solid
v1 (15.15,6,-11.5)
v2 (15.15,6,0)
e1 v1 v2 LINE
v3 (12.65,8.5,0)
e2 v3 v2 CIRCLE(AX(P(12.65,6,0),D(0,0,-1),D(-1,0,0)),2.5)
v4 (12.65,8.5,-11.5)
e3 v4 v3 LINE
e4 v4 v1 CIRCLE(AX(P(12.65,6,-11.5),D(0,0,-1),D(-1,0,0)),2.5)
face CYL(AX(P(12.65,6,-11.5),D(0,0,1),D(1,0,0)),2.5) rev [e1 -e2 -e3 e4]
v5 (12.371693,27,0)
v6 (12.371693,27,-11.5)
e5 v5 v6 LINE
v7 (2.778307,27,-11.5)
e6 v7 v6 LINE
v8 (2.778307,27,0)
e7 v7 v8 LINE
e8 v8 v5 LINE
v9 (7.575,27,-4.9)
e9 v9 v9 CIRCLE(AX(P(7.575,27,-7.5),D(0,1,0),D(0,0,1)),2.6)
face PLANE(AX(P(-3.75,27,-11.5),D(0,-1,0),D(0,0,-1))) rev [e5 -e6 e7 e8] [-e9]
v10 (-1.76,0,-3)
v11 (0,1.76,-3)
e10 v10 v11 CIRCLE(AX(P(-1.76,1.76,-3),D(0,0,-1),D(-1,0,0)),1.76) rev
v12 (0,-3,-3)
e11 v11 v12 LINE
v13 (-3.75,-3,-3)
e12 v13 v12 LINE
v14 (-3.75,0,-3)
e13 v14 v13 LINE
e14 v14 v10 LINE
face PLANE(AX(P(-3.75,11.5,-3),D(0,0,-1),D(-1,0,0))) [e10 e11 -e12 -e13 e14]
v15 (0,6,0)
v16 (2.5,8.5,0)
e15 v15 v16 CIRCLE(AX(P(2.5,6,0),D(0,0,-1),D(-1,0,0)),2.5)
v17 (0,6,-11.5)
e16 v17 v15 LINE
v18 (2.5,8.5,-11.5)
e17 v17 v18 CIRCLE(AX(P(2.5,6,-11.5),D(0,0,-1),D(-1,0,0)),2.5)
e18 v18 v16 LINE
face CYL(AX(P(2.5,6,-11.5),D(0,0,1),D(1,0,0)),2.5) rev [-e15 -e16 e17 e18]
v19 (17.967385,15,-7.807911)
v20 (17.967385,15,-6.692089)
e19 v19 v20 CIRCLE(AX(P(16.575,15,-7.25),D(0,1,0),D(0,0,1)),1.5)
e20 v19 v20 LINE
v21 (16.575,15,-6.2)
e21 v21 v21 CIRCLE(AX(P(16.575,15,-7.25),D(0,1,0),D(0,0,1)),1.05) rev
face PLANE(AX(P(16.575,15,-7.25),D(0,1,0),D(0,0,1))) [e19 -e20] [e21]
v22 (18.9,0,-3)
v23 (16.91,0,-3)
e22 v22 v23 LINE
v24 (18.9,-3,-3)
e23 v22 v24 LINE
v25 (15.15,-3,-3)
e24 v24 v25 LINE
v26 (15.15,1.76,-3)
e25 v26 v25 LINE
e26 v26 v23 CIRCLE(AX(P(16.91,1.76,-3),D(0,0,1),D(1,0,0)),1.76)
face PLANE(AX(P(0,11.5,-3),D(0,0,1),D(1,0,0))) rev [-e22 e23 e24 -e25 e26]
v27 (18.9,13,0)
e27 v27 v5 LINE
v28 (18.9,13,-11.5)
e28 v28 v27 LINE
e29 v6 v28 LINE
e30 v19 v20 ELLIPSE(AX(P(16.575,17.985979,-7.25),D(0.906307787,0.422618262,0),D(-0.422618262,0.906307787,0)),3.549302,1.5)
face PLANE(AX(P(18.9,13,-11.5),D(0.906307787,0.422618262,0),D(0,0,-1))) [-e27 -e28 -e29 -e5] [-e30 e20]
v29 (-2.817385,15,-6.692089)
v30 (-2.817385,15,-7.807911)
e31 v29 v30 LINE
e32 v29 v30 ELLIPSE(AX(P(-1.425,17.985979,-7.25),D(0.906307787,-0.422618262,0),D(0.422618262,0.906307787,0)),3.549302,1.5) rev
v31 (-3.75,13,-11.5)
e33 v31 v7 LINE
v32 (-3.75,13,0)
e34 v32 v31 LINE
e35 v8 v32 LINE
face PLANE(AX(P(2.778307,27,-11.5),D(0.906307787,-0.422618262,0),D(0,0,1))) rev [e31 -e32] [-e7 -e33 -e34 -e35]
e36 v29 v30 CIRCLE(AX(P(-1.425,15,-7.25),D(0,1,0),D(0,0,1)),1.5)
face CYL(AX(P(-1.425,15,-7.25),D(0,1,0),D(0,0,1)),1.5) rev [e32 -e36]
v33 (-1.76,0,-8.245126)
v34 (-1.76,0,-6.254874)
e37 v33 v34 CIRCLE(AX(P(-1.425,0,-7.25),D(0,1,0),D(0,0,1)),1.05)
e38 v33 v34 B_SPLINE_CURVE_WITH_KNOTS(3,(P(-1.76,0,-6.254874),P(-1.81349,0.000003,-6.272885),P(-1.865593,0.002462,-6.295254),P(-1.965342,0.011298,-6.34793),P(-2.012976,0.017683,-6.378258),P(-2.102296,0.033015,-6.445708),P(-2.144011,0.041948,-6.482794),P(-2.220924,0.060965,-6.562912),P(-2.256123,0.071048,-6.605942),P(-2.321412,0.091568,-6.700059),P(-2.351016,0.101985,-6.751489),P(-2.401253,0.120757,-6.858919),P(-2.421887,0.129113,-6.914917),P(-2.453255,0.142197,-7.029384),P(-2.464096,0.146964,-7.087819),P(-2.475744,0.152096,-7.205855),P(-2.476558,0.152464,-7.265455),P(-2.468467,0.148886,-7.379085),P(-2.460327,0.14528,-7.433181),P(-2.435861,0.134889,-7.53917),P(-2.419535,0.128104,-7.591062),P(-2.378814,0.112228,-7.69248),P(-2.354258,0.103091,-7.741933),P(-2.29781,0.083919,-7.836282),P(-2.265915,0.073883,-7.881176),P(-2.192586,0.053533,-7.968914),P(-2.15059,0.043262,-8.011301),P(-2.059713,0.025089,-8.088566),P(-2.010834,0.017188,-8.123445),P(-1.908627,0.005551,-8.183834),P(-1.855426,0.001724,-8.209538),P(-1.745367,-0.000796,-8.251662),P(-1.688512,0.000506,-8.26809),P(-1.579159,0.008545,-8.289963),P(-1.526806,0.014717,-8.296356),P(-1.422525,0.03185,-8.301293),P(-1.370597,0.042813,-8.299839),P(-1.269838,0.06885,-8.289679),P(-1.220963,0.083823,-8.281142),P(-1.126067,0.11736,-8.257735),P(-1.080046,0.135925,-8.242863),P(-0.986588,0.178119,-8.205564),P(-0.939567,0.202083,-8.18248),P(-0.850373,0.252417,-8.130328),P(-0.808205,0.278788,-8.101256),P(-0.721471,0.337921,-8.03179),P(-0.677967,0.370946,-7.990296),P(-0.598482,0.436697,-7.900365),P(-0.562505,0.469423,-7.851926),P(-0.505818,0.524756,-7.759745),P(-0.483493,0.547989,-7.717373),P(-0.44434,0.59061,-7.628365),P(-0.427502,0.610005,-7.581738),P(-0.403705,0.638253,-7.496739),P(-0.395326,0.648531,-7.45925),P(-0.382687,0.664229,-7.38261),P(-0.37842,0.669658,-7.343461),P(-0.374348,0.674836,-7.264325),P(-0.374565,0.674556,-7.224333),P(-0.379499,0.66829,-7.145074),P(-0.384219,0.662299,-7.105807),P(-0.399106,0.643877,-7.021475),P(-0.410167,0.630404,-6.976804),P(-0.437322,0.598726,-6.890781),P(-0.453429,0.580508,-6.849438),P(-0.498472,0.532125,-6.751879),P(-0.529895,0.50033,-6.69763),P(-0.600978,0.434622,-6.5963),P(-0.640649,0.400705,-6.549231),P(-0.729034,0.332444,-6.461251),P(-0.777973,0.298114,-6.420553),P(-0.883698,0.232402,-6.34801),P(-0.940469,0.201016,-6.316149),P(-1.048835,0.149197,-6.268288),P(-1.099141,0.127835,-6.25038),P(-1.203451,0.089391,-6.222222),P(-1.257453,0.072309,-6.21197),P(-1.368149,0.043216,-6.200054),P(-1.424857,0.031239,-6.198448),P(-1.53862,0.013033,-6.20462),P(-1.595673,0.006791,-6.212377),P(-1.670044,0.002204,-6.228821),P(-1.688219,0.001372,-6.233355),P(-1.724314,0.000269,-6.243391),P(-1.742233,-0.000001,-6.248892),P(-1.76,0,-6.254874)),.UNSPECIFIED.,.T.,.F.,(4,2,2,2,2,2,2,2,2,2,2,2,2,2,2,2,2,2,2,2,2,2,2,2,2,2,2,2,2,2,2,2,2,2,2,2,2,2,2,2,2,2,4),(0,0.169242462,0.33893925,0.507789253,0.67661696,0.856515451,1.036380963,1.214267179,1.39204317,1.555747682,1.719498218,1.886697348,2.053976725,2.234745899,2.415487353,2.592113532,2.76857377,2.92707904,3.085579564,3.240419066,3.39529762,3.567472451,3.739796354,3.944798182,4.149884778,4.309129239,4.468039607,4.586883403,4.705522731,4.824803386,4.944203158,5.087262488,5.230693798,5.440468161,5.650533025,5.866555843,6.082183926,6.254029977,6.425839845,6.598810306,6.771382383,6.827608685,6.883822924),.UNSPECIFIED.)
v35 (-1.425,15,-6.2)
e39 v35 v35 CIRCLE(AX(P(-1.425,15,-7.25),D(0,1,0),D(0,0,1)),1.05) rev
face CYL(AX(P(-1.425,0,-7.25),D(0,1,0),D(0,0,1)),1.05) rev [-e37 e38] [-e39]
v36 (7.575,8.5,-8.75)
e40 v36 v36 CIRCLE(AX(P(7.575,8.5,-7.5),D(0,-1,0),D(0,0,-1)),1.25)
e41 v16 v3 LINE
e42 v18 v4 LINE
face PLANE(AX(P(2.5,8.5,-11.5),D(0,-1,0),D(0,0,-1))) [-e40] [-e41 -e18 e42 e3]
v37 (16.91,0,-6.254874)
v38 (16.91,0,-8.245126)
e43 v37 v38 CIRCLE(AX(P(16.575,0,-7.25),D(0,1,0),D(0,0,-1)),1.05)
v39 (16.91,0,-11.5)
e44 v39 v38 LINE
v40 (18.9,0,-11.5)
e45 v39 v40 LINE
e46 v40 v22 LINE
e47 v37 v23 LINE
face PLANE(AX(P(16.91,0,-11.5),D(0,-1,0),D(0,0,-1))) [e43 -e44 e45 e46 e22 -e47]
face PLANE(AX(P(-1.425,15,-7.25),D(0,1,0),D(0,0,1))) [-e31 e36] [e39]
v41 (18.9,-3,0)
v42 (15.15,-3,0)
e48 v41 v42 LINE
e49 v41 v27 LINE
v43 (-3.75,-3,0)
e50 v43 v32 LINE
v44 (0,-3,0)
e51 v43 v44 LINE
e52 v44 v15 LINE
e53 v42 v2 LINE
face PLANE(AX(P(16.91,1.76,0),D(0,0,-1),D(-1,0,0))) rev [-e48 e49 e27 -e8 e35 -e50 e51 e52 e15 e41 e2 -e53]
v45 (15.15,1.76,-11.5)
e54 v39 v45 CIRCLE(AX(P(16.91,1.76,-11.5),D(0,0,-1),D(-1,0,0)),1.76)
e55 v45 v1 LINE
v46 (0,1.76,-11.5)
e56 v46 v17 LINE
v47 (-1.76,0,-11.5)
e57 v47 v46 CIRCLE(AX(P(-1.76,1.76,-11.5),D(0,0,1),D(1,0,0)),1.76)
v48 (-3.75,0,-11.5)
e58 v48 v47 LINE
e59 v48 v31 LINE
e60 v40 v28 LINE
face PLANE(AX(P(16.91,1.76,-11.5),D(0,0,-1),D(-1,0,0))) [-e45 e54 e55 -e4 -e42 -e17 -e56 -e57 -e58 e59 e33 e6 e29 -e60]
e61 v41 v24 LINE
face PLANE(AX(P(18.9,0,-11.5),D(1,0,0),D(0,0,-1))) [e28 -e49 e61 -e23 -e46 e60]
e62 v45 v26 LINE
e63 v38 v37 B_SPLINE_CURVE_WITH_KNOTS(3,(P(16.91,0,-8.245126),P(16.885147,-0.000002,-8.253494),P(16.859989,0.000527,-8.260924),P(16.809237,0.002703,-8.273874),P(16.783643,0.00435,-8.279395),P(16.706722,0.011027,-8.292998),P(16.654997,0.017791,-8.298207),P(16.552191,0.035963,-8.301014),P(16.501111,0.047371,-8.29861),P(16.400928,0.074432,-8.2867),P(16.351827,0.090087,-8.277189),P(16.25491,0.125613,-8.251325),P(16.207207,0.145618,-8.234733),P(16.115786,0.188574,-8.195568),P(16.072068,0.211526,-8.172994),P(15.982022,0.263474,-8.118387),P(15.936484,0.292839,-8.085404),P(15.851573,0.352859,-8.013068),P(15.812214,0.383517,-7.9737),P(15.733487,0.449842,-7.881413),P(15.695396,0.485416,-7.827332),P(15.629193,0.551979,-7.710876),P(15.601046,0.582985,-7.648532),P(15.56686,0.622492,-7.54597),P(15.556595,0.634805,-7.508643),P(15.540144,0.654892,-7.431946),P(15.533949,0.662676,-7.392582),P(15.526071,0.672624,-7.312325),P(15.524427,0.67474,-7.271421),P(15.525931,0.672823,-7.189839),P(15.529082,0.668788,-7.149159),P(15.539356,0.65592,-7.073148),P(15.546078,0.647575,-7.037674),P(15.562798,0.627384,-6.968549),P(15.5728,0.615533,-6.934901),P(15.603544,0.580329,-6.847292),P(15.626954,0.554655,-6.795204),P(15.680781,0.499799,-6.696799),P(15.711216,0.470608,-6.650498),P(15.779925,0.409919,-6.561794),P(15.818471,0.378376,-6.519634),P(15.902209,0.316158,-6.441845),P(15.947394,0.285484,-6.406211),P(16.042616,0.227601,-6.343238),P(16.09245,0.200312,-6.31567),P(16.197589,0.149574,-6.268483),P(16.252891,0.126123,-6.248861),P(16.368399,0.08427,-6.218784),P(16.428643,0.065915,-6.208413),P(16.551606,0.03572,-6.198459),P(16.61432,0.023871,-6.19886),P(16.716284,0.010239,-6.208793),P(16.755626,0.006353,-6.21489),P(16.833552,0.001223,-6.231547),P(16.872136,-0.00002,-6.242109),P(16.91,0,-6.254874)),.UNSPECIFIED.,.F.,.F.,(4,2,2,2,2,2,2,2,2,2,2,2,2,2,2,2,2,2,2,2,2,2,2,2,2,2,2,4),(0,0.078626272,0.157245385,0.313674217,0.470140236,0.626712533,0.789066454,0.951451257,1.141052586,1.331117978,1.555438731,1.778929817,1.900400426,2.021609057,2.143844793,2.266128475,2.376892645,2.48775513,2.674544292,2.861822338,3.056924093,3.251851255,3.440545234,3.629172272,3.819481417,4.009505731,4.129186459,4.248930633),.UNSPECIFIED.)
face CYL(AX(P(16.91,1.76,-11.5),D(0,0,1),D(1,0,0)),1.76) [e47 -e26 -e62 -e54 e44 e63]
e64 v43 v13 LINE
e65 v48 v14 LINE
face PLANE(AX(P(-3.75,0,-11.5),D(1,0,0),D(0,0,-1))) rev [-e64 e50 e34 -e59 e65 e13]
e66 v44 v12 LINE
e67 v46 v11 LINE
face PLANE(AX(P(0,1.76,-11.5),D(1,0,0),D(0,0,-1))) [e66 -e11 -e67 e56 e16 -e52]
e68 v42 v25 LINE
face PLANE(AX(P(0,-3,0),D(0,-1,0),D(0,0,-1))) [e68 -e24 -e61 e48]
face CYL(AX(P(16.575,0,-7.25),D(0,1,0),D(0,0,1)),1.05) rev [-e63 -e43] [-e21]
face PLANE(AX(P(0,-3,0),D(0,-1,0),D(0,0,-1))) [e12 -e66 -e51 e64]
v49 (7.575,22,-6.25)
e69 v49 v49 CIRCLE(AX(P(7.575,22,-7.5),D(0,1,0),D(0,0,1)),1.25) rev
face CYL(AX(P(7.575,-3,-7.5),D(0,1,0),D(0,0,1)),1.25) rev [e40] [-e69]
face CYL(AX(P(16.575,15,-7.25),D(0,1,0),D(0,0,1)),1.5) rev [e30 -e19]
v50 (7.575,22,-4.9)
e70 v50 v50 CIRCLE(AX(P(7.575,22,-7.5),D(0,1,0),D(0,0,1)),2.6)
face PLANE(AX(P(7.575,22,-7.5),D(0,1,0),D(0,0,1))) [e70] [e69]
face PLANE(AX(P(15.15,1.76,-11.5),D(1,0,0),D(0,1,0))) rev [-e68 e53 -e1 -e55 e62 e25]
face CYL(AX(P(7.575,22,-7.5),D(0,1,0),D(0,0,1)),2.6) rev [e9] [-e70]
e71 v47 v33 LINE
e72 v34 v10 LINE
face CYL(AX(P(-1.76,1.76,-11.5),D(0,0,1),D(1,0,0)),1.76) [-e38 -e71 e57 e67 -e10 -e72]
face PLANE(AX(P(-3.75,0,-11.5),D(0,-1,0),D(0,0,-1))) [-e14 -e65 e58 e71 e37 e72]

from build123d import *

# Parameters (mm, degrees)
BOSS_EXTRUDE1_DEPTH      = 11.5
CUT_EXTRUDE1_DEPTH       = 35.906446396
CUT_EXTRUDE1_DEPTH_BACK  = 35.906446396
SKETCH3_R                = 1.05
BOSS_EXTRUDE2_DEPTH      = 3
BOSS_EXTRUDE2_DEPTH_BACK = 11.5
SKETCH4_W                = 3.75
SKETCH4_H                = 3
CUT_EXTRUDE2_DEPTH       = 38.275461128
CUT_EXTRUDE2_DEPTH_BACK  = 38.275461128
SKETCH5_R                = 1.25
CHAMFER1_SIZE            = 6.528307214
CHAMFER1_SIZE_2          = 14
CHAMFER2_SIZE            = 6.528307214
CHAMFER2_SIZE_2          = 14
SKETCH6_R                = 2.6
CUT_EXTRUDE3_DEPTH       = 5
SKETCH7_R                = 1.5
CUT_EXTRUDE4_DEPTH       = 12


with BuildPart() as part:
    # Sketch1 → Boss-Extrude1 (new body)
    with BuildSketch(Plane.XY):
        with BuildLine():
            Line((16.91, 0), (18.9, 0))
            Line((18.9, 0), (18.9, 27))
            Line((18.9, 27), (-3.75, 27))
            Line((-3.75, 27), (-3.75, 0))
            Line((-3.75, 0), (-1.76, 0))
            ThreePointArc((-1.76, 0), (-0.515492065, 0.515492065), (0, 1.76))
            Line((0, 1.76), (0, 6))
            ThreePointArc((0, 6), (0.732233047, 7.767766953), (2.5, 8.5))
            Line((2.5, 8.5), (12.65, 8.5))
            ThreePointArc((12.65, 8.5), (14.417766953, 7.767766953), (15.15, 6))
            Line((15.15, 6), (15.15, 1.76))
            ThreePointArc((15.15, 1.76), (15.665492065, 0.515492065), (16.91, 0))
        make_face()
    extrude(amount=-BOSS_EXTRUDE1_DEPTH)

    # Sketch3 → Cut-Extrude1 (cut, two sides: drawn at the far end of the back side and taken through both)
    with BuildSketch(Plane(origin=(0, 27, 0), x_dir=(1, 0, 0), z_dir=(0, 1, 0)).offset(-CUT_EXTRUDE1_DEPTH_BACK)):
        with Locations(Location((-1.425, 7.25, 0), (0, 0, 251.394661296))):
            Circle(SKETCH3_R)
        with Locations(Location((16.575, 7.25, 0), (0, 0, 288.605338704))):
            Circle(SKETCH3_R)
    extrude(amount=CUT_EXTRUDE1_DEPTH + CUT_EXTRUDE1_DEPTH_BACK, mode=Mode.SUBTRACT)

    # Sketch4 → Boss-Extrude2 (add, two sides: drawn at the far end of the back side and taken through both)
    with BuildSketch(Plane.XZ.offset(-BOSS_EXTRUDE2_DEPTH_BACK)):
        with Locations((17.025, -1.5)):
            Rectangle(SKETCH4_W, SKETCH4_H)
        with Locations((-1.875, -1.5)):
            Rectangle(SKETCH4_W, SKETCH4_H)
    extrude(amount=BOSS_EXTRUDE2_DEPTH + BOSS_EXTRUDE2_DEPTH_BACK)

    # Sketch5 → Cut-Extrude2 (cut, two sides: drawn at the far end of the back side and taken through both)
    with BuildSketch(Plane(origin=(0, 27, 0), x_dir=(1, 0, 0), z_dir=(0, 1, 0)).offset(-CUT_EXTRUDE2_DEPTH_BACK)):
        with Locations(Location((7.575, 7.5, 0), (0, 0, 90))):
            Circle(SKETCH5_R)
    extrude(amount=CUT_EXTRUDE2_DEPTH + CUT_EXTRUDE2_DEPTH_BACK, mode=Mode.SUBTRACT)

    # Chamfer1
    # the kernel refuses this chamfer: 14, 6.528307214 mm, written as the material it takes off along each edge
    with BuildSketch(Plane(origin=(-3.75, 27, 36.2736566), x_dir=(0.9971975577536776, 0.07481330637059945, 0), z_dir=(0, 0, -1))) as chamfer1_piece_1:
        Polygon((CHAMFER1_SIZE * 0.99719755778, CHAMFER1_SIZE * 0.0748133063725), (-CHAMFER1_SIZE_2 * 0.0748133063706, CHAMFER1_SIZE_2 * 0.997197557754), (0, 0), align=None)
    extrude(amount=84.0473132, mode=Mode.SUBTRACT)

    # Chamfer2
    # the kernel refuses this chamfer: 14, 6.528307214 mm, written as the material it takes off along each edge
    with BuildSketch(Plane(origin=(18.9, 27, 36.2736566), x_dir=(-0.9971975577536776, 0.07481330637059945, 0), z_dir=(0, 0, -1))) as chamfer2_piece_1:
        Polygon((CHAMFER2_SIZE * 0.99719755778, -CHAMFER2_SIZE * 0.0748133063725), (-CHAMFER2_SIZE_2 * 0.0748133063706, -CHAMFER2_SIZE_2 * 0.997197557754), (0, 0), align=None)
    extrude(amount=84.0473132, mode=Mode.SUBTRACT)

    # Sketch6 → Cut-Extrude3 (cut)
    with BuildSketch(Plane(origin=(0, 27, 0), x_dir=(1, 0, 0), z_dir=(0, 1, 0))):
        with Locations(Location((7.575, 7.5, 0), (0, 0, 270))):
            Circle(SKETCH6_R)
    extrude(amount=-CUT_EXTRUDE3_DEPTH, mode=Mode.SUBTRACT)

    # Sketch7 → Cut-Extrude4 (cut)
    with BuildSketch(Plane(origin=(0, 27, 0), x_dir=(1, 0, 0), z_dir=(0, 1, 0))):
        with Locations((-1.425, 7.25)):
            Circle(SKETCH7_R)
        with Locations((16.575, 7.25)):
            Circle(SKETCH7_R)
    extrude(amount=-CUT_EXTRUDE4_DEPTH, mode=Mode.SUBTRACT)


solid = part.part
